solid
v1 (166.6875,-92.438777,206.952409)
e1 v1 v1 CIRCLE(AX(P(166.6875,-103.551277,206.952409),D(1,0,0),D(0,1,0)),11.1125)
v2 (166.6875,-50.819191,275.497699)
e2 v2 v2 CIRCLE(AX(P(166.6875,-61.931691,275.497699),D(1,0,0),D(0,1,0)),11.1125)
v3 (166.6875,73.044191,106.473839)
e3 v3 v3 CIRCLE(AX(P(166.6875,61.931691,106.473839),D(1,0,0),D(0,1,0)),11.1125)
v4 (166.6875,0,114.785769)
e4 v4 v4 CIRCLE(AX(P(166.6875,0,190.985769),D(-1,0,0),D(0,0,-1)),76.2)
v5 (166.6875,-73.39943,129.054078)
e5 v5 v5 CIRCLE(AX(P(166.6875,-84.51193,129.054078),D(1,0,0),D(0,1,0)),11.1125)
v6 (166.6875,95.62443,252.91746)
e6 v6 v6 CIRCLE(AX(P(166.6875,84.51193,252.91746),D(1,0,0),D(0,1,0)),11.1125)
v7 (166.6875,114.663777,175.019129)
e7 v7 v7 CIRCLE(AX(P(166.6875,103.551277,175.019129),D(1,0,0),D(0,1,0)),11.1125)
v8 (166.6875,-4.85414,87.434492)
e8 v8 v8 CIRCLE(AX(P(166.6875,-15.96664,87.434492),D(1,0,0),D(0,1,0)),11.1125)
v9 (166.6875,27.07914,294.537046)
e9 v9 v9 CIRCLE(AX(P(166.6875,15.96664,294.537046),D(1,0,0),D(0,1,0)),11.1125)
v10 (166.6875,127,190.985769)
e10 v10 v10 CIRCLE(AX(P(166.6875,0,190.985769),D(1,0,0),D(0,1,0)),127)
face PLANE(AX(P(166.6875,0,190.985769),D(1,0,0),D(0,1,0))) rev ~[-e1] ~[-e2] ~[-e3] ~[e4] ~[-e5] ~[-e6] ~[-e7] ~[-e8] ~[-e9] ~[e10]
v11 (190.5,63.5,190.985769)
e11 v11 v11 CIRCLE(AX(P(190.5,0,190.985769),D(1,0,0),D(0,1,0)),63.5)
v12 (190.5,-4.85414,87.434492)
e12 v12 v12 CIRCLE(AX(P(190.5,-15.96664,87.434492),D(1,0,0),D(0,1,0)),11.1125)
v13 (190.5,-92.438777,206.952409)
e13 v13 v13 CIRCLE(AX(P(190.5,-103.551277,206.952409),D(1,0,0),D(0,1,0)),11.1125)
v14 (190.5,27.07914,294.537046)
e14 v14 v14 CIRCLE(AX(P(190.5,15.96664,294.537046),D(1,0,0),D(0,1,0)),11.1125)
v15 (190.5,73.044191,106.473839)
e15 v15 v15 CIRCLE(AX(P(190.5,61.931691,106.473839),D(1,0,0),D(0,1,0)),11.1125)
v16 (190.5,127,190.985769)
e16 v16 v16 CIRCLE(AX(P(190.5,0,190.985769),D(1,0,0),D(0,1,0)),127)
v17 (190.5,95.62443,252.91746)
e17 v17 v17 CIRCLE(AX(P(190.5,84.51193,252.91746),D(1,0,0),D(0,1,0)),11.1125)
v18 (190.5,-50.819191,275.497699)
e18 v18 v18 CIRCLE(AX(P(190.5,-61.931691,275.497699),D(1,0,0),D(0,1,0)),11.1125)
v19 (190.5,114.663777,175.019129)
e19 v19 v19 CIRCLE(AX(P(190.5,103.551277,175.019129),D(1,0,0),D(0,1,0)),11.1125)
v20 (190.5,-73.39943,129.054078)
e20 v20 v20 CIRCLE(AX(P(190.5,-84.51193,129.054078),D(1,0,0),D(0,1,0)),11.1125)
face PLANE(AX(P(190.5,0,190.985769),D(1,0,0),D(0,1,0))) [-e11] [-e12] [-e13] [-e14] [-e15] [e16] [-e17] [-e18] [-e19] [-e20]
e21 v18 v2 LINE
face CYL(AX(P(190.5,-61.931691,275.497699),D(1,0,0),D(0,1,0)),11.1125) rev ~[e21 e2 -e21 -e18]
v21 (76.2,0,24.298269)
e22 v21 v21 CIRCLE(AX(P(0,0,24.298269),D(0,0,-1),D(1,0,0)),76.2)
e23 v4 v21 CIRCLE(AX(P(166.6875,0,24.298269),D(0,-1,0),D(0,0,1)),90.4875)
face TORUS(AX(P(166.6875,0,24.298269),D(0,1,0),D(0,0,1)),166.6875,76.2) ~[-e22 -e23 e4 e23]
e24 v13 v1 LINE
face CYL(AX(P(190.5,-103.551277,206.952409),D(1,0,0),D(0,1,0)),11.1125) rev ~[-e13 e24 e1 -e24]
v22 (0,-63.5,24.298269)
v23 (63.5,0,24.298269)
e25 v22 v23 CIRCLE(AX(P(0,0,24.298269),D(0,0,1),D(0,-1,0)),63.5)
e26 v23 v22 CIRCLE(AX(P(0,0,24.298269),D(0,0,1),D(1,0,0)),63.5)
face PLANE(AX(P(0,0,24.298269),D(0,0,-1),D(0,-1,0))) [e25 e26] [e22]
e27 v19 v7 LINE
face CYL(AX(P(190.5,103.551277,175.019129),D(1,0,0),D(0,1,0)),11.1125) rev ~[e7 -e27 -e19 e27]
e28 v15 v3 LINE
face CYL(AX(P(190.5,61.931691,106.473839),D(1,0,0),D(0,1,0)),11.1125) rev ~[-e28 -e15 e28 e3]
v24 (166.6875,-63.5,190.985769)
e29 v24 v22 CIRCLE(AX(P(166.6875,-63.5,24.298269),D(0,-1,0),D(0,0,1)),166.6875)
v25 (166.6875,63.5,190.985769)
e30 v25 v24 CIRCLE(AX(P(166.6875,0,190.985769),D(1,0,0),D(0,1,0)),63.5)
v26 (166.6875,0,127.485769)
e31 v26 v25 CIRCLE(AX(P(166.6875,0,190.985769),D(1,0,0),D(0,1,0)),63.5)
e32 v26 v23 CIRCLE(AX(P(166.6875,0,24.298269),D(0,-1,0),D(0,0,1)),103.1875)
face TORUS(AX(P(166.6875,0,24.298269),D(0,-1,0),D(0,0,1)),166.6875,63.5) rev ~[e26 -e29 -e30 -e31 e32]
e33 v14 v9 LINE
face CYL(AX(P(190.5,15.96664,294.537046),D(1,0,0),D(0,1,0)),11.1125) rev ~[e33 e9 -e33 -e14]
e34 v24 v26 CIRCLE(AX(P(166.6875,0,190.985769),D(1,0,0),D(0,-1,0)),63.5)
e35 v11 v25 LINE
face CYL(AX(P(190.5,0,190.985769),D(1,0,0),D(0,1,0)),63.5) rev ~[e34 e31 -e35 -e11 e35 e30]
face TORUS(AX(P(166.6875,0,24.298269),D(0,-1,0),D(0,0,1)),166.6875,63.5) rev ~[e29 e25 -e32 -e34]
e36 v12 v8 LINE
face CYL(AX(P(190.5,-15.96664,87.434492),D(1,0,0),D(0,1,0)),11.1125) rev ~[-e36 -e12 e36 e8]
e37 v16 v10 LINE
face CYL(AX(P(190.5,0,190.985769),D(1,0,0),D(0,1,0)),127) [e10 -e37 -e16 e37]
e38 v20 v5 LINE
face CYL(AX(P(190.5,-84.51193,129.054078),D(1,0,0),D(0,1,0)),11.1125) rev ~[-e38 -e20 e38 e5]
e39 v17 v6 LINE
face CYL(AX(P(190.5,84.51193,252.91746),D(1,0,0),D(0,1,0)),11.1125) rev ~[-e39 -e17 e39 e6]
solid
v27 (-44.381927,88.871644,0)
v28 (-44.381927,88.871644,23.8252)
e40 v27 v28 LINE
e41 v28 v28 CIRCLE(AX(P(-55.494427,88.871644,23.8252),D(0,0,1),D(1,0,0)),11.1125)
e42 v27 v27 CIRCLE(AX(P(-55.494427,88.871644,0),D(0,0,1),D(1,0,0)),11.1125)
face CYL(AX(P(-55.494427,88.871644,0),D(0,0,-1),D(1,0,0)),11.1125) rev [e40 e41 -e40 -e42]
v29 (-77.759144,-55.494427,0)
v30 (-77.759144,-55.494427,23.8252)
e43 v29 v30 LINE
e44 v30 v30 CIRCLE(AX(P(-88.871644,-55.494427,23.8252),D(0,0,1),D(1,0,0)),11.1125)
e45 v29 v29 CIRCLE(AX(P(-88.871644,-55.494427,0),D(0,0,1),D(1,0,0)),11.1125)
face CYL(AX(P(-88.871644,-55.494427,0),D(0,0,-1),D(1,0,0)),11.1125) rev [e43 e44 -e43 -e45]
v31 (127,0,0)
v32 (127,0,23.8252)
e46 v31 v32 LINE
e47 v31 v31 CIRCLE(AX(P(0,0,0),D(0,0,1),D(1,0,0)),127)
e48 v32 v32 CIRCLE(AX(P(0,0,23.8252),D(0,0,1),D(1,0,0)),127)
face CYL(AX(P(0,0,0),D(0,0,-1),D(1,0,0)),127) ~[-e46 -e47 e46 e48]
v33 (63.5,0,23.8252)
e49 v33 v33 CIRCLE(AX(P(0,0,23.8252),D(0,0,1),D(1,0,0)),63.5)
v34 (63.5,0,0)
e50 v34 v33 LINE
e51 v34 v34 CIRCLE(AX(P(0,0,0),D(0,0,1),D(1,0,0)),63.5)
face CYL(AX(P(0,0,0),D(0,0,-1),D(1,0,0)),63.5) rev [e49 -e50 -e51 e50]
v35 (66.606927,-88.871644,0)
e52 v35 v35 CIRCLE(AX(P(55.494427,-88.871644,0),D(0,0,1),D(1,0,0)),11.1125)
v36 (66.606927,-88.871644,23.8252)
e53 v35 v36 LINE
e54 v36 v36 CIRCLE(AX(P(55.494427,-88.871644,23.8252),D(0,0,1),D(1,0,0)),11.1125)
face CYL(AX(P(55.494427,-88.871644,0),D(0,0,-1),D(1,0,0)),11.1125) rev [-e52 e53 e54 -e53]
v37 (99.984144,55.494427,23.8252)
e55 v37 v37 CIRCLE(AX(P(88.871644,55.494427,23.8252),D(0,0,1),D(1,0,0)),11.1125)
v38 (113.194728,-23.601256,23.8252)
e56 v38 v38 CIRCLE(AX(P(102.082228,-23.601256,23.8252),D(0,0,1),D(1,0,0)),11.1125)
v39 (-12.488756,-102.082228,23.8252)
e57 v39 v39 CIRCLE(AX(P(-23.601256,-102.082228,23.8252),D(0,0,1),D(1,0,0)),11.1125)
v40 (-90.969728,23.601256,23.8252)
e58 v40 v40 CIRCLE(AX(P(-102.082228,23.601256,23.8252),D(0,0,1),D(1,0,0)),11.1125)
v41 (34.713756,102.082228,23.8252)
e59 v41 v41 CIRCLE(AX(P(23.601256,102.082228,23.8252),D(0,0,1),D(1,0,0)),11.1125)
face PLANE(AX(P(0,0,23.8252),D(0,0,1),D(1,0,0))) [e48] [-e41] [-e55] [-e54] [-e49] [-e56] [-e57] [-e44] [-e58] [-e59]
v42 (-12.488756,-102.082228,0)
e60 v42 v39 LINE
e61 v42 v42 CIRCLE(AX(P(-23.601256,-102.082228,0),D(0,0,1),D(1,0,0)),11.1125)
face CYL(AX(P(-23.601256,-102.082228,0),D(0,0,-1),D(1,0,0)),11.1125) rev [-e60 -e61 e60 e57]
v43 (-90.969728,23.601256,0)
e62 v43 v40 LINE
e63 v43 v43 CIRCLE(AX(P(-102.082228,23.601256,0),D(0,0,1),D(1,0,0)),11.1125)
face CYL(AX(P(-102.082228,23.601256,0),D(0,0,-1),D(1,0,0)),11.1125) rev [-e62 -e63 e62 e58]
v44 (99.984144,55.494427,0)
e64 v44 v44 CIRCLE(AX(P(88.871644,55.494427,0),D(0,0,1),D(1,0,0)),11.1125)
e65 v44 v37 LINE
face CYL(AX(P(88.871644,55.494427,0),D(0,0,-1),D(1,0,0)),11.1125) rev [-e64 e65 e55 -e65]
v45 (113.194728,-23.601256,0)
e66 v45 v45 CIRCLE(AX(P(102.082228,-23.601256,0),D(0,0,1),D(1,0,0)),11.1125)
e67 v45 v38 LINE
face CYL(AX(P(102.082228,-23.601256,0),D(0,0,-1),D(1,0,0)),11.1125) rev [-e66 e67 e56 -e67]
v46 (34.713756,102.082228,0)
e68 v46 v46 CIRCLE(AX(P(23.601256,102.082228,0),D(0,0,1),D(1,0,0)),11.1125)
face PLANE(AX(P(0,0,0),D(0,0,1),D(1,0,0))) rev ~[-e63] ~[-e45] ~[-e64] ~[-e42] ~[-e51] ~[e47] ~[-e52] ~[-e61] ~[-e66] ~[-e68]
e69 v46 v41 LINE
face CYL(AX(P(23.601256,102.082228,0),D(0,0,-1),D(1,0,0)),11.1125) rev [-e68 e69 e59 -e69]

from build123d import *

# Parameters (mm, degrees)
F2_R     = 127
F2_R_2   = 11.1125
F2_R_3   = 63.5
F3_DEPTH = 23.8125
F5_ANGLE = 90
F0_R     = 127
F0_R_2   = 11.1125
F0_R_3   = 63.5
F6_DEPTH = 23.8252


with BuildPart() as f3:
    # F2 (on offset) → F3 (new body)
    with BuildSketch(Plane.YZ.offset(190.5)):
        with Locations((0, 190.9857690334)):
            Circle(F2_R)
        with Locations((-15.9666395956, 87.4344916631)):
            Circle(F2_R_2, mode=Mode.SUBTRACT)
        with Locations((-84.5119295599, 129.0540777352)):
            Circle(F2_R_2, mode=Mode.SUBTRACT)
        with Locations((61.9316912983, 106.4738394735)):
            Circle(F2_R_2, mode=Mode.SUBTRACT)
        with Locations((103.5512773703, 175.0191294378)):
            Circle(F2_R_2, mode=Mode.SUBTRACT)
        with Locations((-103.5512773703, 206.952408629)):
            Circle(F2_R_2, mode=Mode.SUBTRACT)
        with Locations((-61.9316912983, 275.4976985933)):
            Circle(F2_R_2, mode=Mode.SUBTRACT)
        with Locations((0, 190.9857690334)):
            Circle(F2_R_3, mode=Mode.SUBTRACT)
        with Locations((84.5119295599, 252.9174603317)):
            Circle(F2_R_2, mode=Mode.SUBTRACT)
        with Locations((15.9666395956, 294.5370464037)):
            Circle(F2_R_2, mode=Mode.SUBTRACT)
    extrude(amount=-F3_DEPTH)

    # F4 (on face) → F5 (revolve)
    with BuildSketch(Plane(origin=(166.6875, 0, 0), x_dir=(0, -1, 0), z_dir=(-1, 0, 0))):
        with BuildLine():
            ThreePointArc((76.2, 190.9857690334), (-53.8815367264, 244.8673057598), (0, 114.7857690334))
            ThreePointArc((0, 114.7857690334), (53.8815367264, 137.104232307), (76.2, 190.9857690334))
        make_face()
        with BuildLine():
            ThreePointArc((0, 127.4857690334), (-44.9012806053, 235.8870496388), (63.5, 190.9857690334))
            ThreePointArc((63.5, 190.9857690334), (44.9012806053, 146.0844884281), (0, 127.4857690334))
        make_face(mode=Mode.SUBTRACT)
    revolve(axis=Axis((166.6875, -174.7182756662, 24.2982690334), (0, -1, 0)), revolution_arc=F5_ANGLE)


with BuildPart() as f6:
    # F0 (on Top) → F6 (new body)
    with BuildSketch(Plane.XY):
        Circle(F0_R)
        with Locations((-23.6012563885, -102.0822282373)):
            Circle(F0_R_2, mode=Mode.SUBTRACT)
        with Locations((-88.871644262, -55.4944273884)):
            Circle(F0_R_2, mode=Mode.SUBTRACT)
        with Locations((55.4944273884, -88.871644262)):
            Circle(F0_R_2, mode=Mode.SUBTRACT)
        with Locations((102.0822282373, -23.6012563885)):
            Circle(F0_R_2, mode=Mode.SUBTRACT)
        with Locations((-102.0822282373, 23.6012563885)):
            Circle(F0_R_2, mode=Mode.SUBTRACT)
        with Locations((-55.4944273884, 88.871644262)):
            Circle(F0_R_2, mode=Mode.SUBTRACT)
        Circle(F0_R_3, mode=Mode.SUBTRACT)
        with Locations((88.871644262, 55.4944273884)):
            Circle(F0_R_2, mode=Mode.SUBTRACT)
        with Locations((23.6012563885, 102.0822282373)):
            Circle(F0_R_2, mode=Mode.SUBTRACT)
    extrude(amount=F6_DEPTH)


solid = Compound([f3.part, f6.part])
